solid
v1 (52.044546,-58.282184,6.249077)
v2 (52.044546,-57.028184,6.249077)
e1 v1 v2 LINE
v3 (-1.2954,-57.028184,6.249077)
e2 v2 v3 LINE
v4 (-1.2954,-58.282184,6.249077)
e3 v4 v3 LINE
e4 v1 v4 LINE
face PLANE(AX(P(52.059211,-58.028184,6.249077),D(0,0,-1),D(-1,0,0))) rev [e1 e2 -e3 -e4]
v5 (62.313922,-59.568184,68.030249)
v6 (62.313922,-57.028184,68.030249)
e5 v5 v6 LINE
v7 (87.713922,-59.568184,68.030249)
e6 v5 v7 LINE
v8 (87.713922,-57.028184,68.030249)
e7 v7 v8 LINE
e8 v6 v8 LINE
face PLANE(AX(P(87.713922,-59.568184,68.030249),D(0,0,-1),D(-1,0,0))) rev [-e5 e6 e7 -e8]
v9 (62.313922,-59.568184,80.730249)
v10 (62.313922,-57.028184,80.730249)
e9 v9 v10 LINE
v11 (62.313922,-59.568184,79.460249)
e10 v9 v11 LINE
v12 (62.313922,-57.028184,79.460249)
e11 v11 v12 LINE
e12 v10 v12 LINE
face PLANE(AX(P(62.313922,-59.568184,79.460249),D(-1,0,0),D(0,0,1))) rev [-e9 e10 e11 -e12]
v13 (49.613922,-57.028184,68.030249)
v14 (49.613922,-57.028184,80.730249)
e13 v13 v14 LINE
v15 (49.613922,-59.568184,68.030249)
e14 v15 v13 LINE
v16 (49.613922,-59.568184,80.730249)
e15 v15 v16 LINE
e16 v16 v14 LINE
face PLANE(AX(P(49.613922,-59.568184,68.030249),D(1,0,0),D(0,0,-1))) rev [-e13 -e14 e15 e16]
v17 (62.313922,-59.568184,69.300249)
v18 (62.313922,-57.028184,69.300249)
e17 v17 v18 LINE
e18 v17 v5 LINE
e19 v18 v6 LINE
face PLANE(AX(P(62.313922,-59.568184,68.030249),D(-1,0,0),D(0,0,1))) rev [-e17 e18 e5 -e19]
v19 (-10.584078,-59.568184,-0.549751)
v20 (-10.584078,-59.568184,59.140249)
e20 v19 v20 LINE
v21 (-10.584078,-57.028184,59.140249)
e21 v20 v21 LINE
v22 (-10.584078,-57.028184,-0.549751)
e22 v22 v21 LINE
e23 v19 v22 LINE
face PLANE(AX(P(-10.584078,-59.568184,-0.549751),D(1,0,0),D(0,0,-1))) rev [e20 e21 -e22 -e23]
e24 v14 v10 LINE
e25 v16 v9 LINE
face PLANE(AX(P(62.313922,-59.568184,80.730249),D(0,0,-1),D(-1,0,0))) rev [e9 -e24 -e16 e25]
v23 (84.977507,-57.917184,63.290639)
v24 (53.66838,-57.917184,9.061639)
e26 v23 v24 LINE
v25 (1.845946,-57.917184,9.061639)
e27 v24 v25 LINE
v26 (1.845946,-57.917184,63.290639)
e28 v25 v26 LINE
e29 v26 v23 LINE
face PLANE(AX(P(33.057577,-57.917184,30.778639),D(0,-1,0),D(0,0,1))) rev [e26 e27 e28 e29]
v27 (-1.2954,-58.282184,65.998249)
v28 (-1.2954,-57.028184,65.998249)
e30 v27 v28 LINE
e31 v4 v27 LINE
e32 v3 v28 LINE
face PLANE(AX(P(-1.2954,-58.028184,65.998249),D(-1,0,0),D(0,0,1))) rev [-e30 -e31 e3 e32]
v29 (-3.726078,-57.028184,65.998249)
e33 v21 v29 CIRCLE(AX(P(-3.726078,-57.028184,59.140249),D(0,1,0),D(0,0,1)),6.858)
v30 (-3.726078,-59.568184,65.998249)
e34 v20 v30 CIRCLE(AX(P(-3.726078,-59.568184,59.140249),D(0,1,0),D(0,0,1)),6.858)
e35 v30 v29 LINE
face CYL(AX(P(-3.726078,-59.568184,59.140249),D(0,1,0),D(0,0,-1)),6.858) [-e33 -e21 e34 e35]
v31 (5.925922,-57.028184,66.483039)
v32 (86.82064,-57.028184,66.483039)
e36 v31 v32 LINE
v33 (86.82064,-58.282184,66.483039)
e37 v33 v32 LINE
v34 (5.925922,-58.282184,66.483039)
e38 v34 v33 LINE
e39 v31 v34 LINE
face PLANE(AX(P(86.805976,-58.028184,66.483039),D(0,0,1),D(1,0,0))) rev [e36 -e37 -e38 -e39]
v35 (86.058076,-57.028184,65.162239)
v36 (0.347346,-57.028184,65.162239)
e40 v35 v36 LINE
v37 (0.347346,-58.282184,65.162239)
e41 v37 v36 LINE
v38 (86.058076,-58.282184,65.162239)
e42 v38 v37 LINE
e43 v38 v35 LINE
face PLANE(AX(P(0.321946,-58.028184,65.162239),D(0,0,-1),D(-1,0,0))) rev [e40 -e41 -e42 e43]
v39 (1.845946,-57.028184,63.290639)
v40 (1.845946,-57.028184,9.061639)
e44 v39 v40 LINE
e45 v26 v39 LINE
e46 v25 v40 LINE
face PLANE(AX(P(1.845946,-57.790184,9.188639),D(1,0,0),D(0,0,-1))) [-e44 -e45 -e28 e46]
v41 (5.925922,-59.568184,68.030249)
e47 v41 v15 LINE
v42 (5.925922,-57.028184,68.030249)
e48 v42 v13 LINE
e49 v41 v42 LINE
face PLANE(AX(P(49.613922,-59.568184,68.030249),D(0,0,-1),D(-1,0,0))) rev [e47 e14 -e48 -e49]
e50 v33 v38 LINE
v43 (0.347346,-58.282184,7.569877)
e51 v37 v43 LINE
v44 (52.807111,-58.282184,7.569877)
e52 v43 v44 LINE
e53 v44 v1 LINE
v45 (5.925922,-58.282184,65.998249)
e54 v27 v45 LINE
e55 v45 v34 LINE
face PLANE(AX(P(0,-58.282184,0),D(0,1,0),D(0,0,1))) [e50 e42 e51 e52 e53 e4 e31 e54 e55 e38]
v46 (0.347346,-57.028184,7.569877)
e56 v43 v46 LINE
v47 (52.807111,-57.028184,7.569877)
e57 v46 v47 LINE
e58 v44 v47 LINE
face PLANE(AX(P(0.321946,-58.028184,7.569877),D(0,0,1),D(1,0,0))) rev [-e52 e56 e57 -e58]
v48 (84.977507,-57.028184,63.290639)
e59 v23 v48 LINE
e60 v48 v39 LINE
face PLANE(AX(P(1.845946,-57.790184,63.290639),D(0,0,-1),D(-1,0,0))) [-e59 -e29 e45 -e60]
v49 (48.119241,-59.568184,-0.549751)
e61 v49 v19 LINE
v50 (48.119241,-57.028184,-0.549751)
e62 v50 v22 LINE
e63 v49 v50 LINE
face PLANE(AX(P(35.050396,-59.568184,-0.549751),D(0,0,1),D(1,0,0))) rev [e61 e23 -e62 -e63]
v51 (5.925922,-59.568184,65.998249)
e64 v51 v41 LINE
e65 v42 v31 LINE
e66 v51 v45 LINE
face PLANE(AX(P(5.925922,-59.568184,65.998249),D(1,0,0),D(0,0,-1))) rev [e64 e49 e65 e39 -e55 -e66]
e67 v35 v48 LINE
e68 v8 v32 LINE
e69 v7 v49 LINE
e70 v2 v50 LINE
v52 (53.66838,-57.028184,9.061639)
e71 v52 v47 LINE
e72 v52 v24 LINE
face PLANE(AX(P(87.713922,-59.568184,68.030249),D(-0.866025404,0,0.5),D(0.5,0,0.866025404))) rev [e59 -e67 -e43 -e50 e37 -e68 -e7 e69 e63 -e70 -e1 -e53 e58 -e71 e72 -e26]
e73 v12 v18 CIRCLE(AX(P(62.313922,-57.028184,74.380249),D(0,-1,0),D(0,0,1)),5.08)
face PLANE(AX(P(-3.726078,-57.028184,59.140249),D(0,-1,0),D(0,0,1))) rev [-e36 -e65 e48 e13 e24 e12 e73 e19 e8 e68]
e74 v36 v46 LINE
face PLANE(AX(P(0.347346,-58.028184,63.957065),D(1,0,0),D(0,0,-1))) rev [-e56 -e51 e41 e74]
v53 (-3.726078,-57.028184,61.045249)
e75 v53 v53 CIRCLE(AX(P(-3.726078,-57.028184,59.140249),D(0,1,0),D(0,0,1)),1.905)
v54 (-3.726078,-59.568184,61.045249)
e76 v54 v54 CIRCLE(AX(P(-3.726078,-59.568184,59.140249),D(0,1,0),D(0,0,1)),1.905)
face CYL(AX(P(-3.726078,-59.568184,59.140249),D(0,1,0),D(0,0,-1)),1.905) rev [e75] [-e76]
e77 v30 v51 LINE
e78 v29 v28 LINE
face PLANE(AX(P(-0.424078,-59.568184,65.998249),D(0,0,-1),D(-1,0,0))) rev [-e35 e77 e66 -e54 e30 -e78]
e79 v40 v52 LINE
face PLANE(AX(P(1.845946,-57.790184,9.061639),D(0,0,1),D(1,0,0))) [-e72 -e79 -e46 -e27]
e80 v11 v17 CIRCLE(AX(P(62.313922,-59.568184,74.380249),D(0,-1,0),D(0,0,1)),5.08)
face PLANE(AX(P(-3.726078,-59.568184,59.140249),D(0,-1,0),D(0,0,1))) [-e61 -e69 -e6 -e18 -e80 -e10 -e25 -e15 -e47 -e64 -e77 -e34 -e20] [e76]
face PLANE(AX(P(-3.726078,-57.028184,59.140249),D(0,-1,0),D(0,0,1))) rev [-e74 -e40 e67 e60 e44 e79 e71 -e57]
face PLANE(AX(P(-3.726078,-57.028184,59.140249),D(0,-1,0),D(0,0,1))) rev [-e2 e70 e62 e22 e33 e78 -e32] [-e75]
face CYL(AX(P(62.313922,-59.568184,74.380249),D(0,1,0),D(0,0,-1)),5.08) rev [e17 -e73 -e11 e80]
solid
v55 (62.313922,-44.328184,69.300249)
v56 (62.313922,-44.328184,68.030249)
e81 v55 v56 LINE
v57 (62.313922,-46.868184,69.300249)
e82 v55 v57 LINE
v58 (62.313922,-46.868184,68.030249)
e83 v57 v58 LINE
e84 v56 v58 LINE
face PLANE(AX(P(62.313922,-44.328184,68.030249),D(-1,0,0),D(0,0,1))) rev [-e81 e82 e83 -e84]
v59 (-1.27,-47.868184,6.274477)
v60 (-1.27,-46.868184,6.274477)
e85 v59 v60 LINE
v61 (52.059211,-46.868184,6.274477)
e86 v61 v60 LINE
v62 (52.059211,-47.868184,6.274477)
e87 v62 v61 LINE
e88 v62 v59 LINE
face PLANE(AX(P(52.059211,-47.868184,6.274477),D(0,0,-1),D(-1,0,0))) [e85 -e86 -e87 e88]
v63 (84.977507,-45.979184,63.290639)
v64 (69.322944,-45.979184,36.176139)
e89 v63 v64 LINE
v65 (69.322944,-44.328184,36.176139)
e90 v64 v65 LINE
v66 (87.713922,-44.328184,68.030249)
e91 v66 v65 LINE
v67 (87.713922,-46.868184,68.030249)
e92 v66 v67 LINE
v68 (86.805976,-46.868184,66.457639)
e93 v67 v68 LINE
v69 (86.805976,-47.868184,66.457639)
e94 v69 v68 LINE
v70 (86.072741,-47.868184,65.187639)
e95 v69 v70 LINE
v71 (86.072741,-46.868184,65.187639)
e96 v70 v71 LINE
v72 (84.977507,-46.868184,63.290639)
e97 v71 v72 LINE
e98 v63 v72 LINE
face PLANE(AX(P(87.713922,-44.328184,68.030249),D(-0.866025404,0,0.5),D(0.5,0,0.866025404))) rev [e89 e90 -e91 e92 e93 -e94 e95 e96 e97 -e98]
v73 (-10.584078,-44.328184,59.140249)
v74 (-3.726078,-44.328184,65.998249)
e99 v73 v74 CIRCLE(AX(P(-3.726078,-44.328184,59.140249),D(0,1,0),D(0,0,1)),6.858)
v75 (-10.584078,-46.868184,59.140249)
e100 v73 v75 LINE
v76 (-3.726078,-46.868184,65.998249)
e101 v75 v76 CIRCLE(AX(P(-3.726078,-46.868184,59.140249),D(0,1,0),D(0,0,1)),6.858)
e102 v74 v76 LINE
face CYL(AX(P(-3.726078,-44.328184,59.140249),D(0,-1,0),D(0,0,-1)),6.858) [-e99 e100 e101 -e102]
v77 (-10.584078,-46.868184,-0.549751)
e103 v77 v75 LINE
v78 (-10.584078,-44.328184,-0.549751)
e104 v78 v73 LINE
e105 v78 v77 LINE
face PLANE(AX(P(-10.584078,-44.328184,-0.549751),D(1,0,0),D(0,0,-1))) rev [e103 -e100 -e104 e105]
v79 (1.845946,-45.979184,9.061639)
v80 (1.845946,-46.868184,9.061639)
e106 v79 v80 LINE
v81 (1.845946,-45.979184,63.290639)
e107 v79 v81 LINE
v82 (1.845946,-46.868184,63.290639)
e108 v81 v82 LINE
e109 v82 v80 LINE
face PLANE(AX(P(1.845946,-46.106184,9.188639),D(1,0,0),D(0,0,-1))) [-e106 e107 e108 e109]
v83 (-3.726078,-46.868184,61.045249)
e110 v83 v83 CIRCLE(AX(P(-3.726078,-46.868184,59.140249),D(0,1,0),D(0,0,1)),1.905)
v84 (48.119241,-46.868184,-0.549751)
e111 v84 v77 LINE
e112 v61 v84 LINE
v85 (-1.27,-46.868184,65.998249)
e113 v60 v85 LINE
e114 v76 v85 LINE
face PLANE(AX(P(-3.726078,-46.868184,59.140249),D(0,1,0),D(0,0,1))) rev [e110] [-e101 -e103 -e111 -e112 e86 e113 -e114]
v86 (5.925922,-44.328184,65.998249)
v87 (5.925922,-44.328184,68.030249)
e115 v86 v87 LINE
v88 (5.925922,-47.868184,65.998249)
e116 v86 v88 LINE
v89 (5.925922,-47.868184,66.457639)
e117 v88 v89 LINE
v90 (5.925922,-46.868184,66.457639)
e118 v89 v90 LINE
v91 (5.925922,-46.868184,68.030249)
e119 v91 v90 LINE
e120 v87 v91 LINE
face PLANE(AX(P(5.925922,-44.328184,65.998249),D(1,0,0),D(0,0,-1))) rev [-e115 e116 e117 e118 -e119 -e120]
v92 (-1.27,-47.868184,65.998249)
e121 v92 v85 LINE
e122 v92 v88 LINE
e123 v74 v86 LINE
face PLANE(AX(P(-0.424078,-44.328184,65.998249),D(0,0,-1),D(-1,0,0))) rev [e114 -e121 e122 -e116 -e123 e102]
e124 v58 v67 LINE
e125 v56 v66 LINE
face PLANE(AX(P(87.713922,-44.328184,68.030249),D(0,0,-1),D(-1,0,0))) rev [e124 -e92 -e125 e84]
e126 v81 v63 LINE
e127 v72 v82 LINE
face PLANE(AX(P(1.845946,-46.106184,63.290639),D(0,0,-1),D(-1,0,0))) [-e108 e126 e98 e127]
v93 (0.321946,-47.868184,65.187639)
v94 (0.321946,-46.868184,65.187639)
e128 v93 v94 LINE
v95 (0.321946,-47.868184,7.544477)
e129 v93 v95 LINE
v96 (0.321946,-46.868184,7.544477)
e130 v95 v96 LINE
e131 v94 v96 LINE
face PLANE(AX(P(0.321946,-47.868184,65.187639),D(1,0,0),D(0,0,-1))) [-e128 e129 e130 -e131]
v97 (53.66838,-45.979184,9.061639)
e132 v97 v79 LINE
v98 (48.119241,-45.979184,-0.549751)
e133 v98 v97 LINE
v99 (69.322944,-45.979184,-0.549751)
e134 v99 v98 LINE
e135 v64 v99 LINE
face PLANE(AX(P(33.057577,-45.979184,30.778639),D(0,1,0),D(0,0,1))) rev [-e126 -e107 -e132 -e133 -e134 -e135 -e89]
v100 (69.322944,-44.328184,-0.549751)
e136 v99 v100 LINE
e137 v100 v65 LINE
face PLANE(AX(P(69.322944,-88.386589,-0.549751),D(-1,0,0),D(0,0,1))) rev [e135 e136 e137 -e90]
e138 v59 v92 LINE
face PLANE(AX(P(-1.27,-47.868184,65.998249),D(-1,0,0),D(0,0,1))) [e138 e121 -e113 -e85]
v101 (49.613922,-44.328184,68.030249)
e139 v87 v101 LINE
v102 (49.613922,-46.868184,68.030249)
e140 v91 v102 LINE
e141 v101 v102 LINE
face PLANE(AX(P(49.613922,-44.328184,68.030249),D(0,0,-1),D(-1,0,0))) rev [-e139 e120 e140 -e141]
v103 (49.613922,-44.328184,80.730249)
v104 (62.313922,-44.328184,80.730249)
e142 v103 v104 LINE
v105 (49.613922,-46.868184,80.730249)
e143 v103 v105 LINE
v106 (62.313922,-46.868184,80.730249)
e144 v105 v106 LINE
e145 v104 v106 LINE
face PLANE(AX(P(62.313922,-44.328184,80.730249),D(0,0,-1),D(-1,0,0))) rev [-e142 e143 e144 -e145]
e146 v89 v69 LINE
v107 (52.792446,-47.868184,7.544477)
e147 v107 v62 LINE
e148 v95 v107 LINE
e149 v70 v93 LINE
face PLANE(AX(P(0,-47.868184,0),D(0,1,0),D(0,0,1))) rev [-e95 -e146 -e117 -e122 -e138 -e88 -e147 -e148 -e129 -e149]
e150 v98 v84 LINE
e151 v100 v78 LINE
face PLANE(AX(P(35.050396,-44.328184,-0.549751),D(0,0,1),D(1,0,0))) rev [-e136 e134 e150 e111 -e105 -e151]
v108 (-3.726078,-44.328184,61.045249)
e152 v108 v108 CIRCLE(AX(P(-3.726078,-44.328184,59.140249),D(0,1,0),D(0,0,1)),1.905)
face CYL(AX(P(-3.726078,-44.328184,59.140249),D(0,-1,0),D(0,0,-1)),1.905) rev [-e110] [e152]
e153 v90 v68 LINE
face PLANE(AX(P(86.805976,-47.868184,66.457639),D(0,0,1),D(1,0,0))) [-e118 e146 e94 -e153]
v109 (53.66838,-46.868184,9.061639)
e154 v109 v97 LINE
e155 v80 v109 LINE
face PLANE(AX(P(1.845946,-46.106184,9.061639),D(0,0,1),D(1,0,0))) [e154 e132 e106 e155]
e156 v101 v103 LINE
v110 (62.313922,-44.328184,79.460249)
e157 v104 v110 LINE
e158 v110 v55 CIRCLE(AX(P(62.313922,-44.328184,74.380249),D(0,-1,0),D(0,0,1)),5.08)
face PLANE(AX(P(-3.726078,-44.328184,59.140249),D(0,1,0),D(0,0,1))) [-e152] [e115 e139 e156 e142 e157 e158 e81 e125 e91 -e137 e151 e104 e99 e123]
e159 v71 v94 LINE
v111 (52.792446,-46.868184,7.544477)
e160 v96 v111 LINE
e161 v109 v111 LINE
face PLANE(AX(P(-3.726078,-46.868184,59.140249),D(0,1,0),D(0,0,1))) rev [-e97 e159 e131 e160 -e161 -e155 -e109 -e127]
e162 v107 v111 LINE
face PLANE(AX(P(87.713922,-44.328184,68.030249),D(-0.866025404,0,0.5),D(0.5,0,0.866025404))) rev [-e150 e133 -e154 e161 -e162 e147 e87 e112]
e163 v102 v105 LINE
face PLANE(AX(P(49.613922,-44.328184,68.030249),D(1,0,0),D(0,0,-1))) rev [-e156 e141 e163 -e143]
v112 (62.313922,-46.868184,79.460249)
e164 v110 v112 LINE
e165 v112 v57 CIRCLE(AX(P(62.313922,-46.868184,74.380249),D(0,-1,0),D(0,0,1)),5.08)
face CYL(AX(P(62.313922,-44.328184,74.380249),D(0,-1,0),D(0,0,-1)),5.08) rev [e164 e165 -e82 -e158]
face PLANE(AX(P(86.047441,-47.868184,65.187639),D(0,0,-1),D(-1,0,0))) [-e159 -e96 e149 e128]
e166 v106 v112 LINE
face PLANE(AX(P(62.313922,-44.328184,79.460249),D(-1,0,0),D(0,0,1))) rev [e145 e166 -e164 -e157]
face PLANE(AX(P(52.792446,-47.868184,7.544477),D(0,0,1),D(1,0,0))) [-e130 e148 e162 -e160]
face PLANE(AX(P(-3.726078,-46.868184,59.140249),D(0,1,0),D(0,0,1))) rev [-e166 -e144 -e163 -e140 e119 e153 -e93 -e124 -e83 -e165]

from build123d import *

# Parameters (mm, degrees)
STANDARD_START                 = 1.845946354
STANDARD_CREDIT_CARD_OUTLINE_W = 0.79375
STANDARD_CREDIT_CARD_OUTLINE_H = 53.975
STANDARD_CREDIT_CARD_DEPTH     = 85.598
MOVE_START                     = 1.845946354
MOVE_FACE1_OUTLINE_W           = 1.04775
MOVE_FACE1_OUTLINE_H           = 54.229
MOVE_FACE1_DEPTH               = 85.725
BOSS_EXTRUDE2_START            = -0.889
SKETCH1_R                      = 1.905
BOSS_EXTRUDE2_DEPTH            = 2.54
BOSS_EXTRUDE3_DEPTH            = 1
SKETCH7_W                      = 6.35
SKETCH7_H                      = 2.032
CUT_EXTRUDE2_DEPTH             = 120.262889651
CUT_EXTRUDE1_DEPTH             = 2
MOVE_START_2                   = -1.27
MOVE_FACE4_OUTLINE_W           = 0.254
MOVE_FACE4_OUTLINE_H           = 1.27
MOVE_FACE4_DEPTH               = 88.075975799
MOVE_FACE4_2_OUTLINE_W         = 0.254
MOVE_FACE4_2_OUTLINE_H         = 57.643162038
MOVE_FACE4_2_DEPTH             = 1.591946354
MOVE_START_3                   = -1.2954
MOVE_FACE5_OUTLINE_W           = 1.254
MOVE_FACE5_OUTLINE_H           = 1.3208
MOVE_FACE5_OUTLINE_H_2         = 0.0254
MOVE_FACE5_OUTLINE_H_3         = 0.836009737
MOVE_FACE5_DEPTH               = 88.116040496
MOVE_FACE5_2_OUTLINE_W         = 1.254
MOVE_FACE5_2_OUTLINE_H         = 57.592362038
MOVE_FACE5_2_DEPTH             = 1.642746354
BOSS_EXTRUDE5_DEPTH            = 1.651


# Read off the part's stored shape, not the designer's step: Standard Credit Card, Move Face1, Move Face4, Move Face5
with BuildPart() as part:
    # Standard Credit Card outline → Standard Credit Card (new body)
    with BuildSketch(Plane.YZ.offset(STANDARD_START)):
        with Locations((-56.663058778, 36.176138951)):
            Rectangle(STANDARD_CREDIT_CARD_OUTLINE_W, STANDARD_CREDIT_CARD_OUTLINE_H)
    extrude(amount=STANDARD_CREDIT_CARD_DEPTH)

    # Move Face1 outline → Move Face1 (add)
    with BuildSketch(Plane.YZ.offset(MOVE_START)):
        with Locations((-56.663058778, 36.176138951)):
            Rectangle(MOVE_FACE1_OUTLINE_W, MOVE_FACE1_OUTLINE_H)
    extrude(amount=MOVE_FACE1_DEPTH)


with BuildPart() as body_2:
    # Sketch1 → Boss-Extrude2 (new body)
    with BuildSketch(Plane(origin=(0, -56.139183778, 0), x_dir=(1, 0, 0), z_dir=(0, 1, 0)).offset(BOSS_EXTRUDE2_START)):
        with BuildLine():
            Line((35.050395743, 0.549751296), (-10.584077546, 0.549751296))
            Line((-10.584077546, 0.549751296), (-10.584077546, -59.140248704))
            ThreePointArc((-10.584077546, -59.140248704), (-8.575415852, -63.989587009), (-3.726077546, -65.998248704))
            Line((-3.726077546, -65.998248704), (-0.424077546, -65.998248704))
            Line((-0.424077546, -65.998248704), (-0.424077546, -68.030248704))
            Line((-0.424077546, -68.030248704), (49.613922454, -68.030248704))
            Line((49.613922454, -68.030248704), (49.613922454, -80.730248704))
            Line((49.613922454, -80.730248704), (62.313922454, -80.730248704))
            Line((62.313922454, -80.730248704), (62.313922454, -79.460248704))
            ThreePointArc((62.313922454, -79.460248704), (57.233922454, -74.380248704), (62.313922454, -69.300248704))
            Line((62.313922454, -69.300248704), (62.313922454, -68.030248704))
            Line((62.313922454, -68.030248704), (87.713922454, -68.030248704))
            Line((87.713922454, -68.030248704), (48.119240993, 0.549751296))
            Line((48.119240993, 0.549751296), (35.050395743, 0.549751296))
        make_face()
        with Locations(Location((-3.726077546, -59.140248704, 0), (0, 0, 270))):
            Circle(SKETCH1_R, mode=Mode.SUBTRACT)
    extrude(amount=BOSS_EXTRUDE2_DEPTH)

    # Combine1: cut part
    add(part.part, mode=Mode.SUBTRACT)

    # Sketch4 → Boss-Extrude3 (add)
    with BuildSketch(Plane(origin=(0, -57.028183778, 0), x_dir=(1, 0, 0), z_dir=(0, 1, 0))):
        Polygon((86.805975799, -66.457638967), (86.072740957, -65.187638967), (86.047441301, -65.187638967), (0.321946354, -65.187638967), (0.321946354, -7.544476929), (52.792445837, -7.544476929), (52.059210995, -6.274476929), (-1.27, -6.274476929), (-1.27, -65.998248704), (-0.424077546, -65.998248704), (-0.424077546, -66.457638967), align=None)
    extrude(amount=-BOSS_EXTRUDE3_DEPTH)

    # Sketch7 → Cut-Extrude2 (cut, through all)
    with BuildSketch(Plane.XZ.offset(58.028183778)):
        with Locations((2.750922454, 67.014248704)):
            Rectangle(SKETCH7_W, SKETCH7_H)
    extrude(amount=-CUT_EXTRUDE2_DEPTH, mode=Mode.SUBTRACT)


with BuildPart() as body_2_2:
    # Mirror1: mirrored copy
    add(body_2.part.mirror(Plane(origin=(-3.726077546, -57.028183778, 59.140248704), x_dir=(0, 0, 1), z_dir=(0, 1, 0))))

    # Sketch5 → Cut-Extrude1 (cut)
    with BuildSketch(Plane(origin=(0, -56.028183778, 0), x_dir=(1, 0, 0), z_dir=(0, 1, 0))):
        Polygon((86.072740957, -65.187638967), (1.357962756, -65.187638967), (0.321946354, -65.187638967), (0.321946354, -63.9570649), (0.321946354, -7.544476929), (52.792445837, -7.544476929), (52.059210995, -6.274476929), (-1.27, -6.274476929), (-1.27, -63.9570649), (-1.27, -65.998248704), (-0.424077546, -65.998248704), (-0.424077546, -66.457638967), (1.357962756, -66.457638967), (86.805975799, -66.457638967), align=None)
    extrude(amount=-CUT_EXTRUDE1_DEPTH, mode=Mode.SUBTRACT)

    # Move Face4 outline → Move Face4 (cut)
    with BuildSketch(Plane.YZ.offset(MOVE_START_2)):
        with Locations((-58.155183778, 6.909476929)):
            Rectangle(MOVE_FACE4_OUTLINE_W, MOVE_FACE4_OUTLINE_H)
        with Locations((-58.155183778, 65.822638967)):
            Rectangle(MOVE_FACE4_OUTLINE_W, MOVE_FACE4_OUTLINE_H)
    extrude(amount=MOVE_FACE4_DEPTH, mode=Mode.SUBTRACT)

    # Move Face4 2 outline → Move Face4 2 (cut)
    with BuildSketch(Plane.YZ.offset(MOVE_START_2)):
        with Locations((-58.155183778, 36.366057948)):
            Rectangle(MOVE_FACE4_2_OUTLINE_W, MOVE_FACE4_2_OUTLINE_H)
    extrude(amount=MOVE_FACE4_2_DEPTH, mode=Mode.SUBTRACT)

    # Move Face5 outline → Move Face5 (cut)
    with BuildSketch(Plane.YZ.offset(MOVE_START_3)):
        with Locations((-57.655183778, 6.909476929)):
            Rectangle(MOVE_FACE5_OUTLINE_W, MOVE_FACE5_OUTLINE_H)
        with Locations((-57.655183778, 66.470338967)):
            Rectangle(MOVE_FACE5_OUTLINE_W, MOVE_FACE5_OUTLINE_H_2)
        with Locations((-57.655183778, 65.580243835)):
            Rectangle(MOVE_FACE5_OUTLINE_W, MOVE_FACE5_OUTLINE_H_3)
    extrude(amount=MOVE_FACE5_DEPTH, mode=Mode.SUBTRACT)

    # Move Face5 2 outline → Move Face5 2 (cut)
    with BuildSketch(Plane.YZ.offset(MOVE_START_3)):
        with Locations((-57.655183778, 36.366057948)):
            Rectangle(MOVE_FACE5_2_OUTLINE_W, MOVE_FACE5_2_OUTLINE_H)
    extrude(amount=MOVE_FACE5_2_DEPTH, mode=Mode.SUBTRACT)


with BuildPart() as body_2_1:
    # Body-Move/Copy1: moved
    add(body_2.part.moved(Location((0, 10.16, 0))))

    # Sketch8 → Boss-Extrude5 (add)
    with BuildSketch(Plane.XZ.offset(44.328183778)):
        Polygon((48.119240993, -0.549751296), (69.322943613, -0.549751296), (69.322943613, 36.176138951), align=None)
    extrude(amount=BOSS_EXTRUDE5_DEPTH)


solid = Compound([body_2_2.part, body_2_1.part])
